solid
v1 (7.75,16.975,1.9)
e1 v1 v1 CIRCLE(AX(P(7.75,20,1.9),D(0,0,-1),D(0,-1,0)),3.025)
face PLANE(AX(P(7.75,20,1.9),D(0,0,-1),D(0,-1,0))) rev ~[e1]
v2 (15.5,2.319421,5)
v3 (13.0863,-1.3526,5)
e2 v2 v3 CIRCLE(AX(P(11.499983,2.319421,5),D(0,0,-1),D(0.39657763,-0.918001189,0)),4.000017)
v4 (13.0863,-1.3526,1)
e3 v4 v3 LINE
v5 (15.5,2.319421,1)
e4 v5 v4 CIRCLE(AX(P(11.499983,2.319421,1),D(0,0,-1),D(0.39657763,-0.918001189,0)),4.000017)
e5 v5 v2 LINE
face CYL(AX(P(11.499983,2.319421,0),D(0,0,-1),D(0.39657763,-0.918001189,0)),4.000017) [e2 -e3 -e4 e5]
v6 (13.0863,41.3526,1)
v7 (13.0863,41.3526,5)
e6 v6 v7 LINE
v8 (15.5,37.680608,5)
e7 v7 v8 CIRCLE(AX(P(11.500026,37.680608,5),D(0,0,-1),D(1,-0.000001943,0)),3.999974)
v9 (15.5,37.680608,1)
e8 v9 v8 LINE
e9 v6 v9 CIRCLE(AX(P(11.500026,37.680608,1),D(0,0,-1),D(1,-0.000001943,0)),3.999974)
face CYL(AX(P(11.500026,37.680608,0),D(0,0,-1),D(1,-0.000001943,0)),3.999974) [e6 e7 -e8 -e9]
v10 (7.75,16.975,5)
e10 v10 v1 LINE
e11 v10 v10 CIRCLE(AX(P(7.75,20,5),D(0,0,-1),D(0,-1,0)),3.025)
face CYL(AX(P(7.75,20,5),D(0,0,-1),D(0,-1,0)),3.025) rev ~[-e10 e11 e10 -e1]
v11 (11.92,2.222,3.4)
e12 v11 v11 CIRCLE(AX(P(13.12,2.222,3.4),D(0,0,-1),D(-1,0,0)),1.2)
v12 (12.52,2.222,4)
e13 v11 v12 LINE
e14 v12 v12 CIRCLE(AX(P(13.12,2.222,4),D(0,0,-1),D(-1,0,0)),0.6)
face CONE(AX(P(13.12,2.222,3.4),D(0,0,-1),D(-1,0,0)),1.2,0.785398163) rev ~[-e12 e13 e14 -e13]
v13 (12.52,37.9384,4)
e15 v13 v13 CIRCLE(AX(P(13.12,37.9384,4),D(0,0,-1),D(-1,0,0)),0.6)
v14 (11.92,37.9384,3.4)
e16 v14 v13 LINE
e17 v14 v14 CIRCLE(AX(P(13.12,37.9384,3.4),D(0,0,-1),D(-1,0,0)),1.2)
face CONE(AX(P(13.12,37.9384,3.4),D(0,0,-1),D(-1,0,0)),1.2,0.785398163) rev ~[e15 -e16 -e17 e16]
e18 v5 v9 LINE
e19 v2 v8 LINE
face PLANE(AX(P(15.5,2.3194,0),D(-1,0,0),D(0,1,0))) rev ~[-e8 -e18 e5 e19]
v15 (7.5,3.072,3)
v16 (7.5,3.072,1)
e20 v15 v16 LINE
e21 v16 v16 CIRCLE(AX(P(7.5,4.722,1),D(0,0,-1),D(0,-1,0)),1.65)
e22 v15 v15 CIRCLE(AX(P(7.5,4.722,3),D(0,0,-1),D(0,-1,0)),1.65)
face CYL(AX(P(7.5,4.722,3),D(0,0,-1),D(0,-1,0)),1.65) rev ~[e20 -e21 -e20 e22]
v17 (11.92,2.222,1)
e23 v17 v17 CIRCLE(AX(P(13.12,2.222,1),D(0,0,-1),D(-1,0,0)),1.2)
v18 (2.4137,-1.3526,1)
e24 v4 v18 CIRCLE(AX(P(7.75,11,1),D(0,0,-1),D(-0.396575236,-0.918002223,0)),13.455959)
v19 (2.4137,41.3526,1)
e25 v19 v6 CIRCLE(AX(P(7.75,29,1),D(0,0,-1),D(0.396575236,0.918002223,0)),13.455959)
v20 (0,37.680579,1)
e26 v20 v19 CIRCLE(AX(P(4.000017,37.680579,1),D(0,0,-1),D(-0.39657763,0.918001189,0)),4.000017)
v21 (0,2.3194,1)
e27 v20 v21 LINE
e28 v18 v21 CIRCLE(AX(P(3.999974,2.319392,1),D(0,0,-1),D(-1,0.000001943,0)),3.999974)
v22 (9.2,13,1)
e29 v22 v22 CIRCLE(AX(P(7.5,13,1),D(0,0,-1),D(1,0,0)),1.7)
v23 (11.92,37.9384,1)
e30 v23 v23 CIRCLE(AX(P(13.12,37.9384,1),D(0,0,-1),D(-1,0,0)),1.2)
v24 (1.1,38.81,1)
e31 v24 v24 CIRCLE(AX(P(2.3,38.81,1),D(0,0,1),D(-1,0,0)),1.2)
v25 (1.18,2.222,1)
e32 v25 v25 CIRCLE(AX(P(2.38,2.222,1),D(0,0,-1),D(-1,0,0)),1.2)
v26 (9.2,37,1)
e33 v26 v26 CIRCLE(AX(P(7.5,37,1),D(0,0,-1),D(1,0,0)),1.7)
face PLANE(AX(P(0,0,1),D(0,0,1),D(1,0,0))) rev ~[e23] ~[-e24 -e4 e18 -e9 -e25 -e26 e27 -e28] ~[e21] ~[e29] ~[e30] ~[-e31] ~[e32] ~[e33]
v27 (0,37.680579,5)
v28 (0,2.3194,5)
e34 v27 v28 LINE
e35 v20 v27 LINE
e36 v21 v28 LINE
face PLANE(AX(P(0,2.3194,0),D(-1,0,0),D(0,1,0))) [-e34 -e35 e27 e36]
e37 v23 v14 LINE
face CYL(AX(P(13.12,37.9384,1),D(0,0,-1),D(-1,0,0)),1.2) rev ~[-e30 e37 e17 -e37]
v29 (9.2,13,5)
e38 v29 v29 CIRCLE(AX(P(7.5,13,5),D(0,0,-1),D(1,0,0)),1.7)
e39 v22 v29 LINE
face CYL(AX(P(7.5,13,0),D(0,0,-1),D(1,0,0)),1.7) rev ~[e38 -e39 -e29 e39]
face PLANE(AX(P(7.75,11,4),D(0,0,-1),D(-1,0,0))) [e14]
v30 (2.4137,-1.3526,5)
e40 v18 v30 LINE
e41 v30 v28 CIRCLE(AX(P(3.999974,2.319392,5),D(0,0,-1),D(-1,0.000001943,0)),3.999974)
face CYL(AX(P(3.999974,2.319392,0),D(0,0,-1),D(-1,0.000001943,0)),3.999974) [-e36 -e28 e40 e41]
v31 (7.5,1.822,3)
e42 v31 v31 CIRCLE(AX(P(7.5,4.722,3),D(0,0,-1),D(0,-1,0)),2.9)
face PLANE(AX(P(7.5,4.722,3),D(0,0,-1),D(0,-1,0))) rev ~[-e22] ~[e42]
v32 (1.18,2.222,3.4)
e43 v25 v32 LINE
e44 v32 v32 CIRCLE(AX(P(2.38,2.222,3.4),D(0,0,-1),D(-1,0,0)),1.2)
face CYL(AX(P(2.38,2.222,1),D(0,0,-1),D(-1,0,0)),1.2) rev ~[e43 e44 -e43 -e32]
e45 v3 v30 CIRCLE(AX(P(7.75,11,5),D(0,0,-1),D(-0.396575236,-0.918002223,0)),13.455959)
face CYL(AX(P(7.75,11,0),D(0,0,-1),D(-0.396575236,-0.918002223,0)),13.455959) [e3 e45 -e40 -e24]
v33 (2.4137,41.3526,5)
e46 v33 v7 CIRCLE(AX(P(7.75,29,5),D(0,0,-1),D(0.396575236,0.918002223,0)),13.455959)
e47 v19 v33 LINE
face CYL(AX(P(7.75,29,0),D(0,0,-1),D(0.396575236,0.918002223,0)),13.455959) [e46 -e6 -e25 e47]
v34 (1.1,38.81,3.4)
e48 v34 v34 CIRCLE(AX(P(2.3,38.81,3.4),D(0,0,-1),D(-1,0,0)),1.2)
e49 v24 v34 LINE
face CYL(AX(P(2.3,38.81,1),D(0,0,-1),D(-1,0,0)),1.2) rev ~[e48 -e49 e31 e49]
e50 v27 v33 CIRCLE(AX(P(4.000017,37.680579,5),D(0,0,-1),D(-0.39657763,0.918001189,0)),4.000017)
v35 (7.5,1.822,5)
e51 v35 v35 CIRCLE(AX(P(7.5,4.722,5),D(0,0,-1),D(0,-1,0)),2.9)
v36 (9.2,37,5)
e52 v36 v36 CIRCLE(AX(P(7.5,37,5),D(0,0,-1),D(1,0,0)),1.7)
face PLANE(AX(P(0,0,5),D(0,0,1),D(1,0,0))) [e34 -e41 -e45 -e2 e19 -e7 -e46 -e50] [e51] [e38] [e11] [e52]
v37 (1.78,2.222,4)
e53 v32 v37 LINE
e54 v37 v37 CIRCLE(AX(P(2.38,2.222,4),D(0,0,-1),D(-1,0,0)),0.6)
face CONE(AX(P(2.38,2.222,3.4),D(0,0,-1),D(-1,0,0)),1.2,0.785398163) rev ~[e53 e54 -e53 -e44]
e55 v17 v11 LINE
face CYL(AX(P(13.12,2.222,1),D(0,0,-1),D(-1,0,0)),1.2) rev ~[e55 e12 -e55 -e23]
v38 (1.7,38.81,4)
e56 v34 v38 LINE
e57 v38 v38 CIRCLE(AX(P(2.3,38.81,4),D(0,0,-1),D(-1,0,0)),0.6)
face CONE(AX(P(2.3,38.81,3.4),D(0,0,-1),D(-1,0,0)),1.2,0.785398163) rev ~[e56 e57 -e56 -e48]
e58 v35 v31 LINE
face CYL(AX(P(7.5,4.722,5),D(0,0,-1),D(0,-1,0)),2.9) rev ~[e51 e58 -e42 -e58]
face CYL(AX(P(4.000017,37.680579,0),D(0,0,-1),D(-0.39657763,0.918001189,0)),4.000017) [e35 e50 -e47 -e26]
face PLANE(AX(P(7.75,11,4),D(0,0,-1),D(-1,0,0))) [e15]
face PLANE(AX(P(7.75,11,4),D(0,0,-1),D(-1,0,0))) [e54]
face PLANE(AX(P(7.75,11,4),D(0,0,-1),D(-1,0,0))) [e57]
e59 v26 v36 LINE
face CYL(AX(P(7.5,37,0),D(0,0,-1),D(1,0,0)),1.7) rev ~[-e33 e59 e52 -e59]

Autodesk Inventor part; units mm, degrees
ref_plane "YZ Plane" through (0, 0, 0) normal (1, 0, 0) x (0, 1, 0)
ref_plane "XZ Plane" through (0, 0, 0) normal (0, 1, 0) x (-1, 0, 0)
ref_plane "XY Plane" through (0, 0, 0) normal (0, 0, 1) x (1, 0, 0)
sketch "Skizze1" plane through (0, 0, 0) normal (0, 0, 1) x (1, 0, 0)
  circle A0 centre (7.5, 13) radius 1.7 projected
  circle A1 centre (7.5, 37) radius 1.7 projected
  arc A2 (15.5, 37.6806) -> (13.0863, 41.3526) centre (11.5, 37.6806) ccw projected
  arc A3 (13.0863, 41.3526) -> (2.4137, 41.3526) centre (7.75, 29) ccw projected
  arc A4 (2.4137, 41.3526) -> (0, 37.6806) centre (4, 37.6806) ccw projected
  line L0 (0, 2.3194) -> (0, 37.6806) projected
  arc A5 (0, 2.3194) -> (2.4137, -1.3526) centre (4, 2.3194) ccw projected
  arc A6 (2.4137, -1.3526) -> (13.0863, -1.3526) centre (7.75, 11) ccw projected
  arc A7 (13.0863, -1.3526) -> (15.5, 2.3194) centre (11.5, 2.3194) ccw projected
  line L1 (15.5, 2.3194) -> (15.5, 37.6806) projected
  point P0 (0, 0)
extrude "Extrusion1" add sketch "Skizze1" along normal blind 5
sketch "Skizze2" plane through (0, 0, 5) normal (0, 0, 1) x (1, 0, 0)
  arc A0 (2.4137, -1.3526) -> (13.0863, -1.3526) centre (7.75, 11) ccw projected
  arc A1 (13.0863, -1.3526) -> (15.5, 2.3194) centre (11.5, 2.3194) ccw projected
  line L0 (15.5, 2.3194) -> (15.5, 37.6806) projected
  arc A2 (15.5, 37.6806) -> (13.0863, 41.3526) centre (11.5, 37.6806) ccw projected
  arc A3 (13.0863, 41.3526) -> (2.4137, 41.3526) centre (7.75, 29) ccw projected
  arc A4 (2.4137, 41.3526) -> (0, 37.6806) centre (4, 37.6806) ccw projected
  line L1 (0, 37.6806) -> (0, 2.3194) projected
  arc A5 (0, 2.3194) -> (2.4137, -1.3526) centre (4, 2.3194) ccw projected
  circle A6 centre (7.5, 37) radius 1.7 projected
  circle A7 centre (7.5, 13) radius 1.7 projected
  line L2 (7.75, 20) -> (7.75, 20)
  line L3 (7.75, 20) -> (7.75, -2.4559)
  line L4 (7.75, -2.4559) -> (7.75, -2.4559)
  line L5 (7.75, -2.4559) -> (7.75, 20)
  point P0 (0, 0)
  point P1 (7.75, -2.4559)
  dimension "d2" = 44.9119
  dimension "d3" = 15.5
  dimension "d4" = 22.456
  dimension "d5" = 0
hole "Bohrung1" at (7.75, 20, 5) direction (0, 0, -1) diameter 6.05 depth 3.1
sketch "Skizze4" plane through (0, 0, 5) normal (0, 0, 1) x (1, 0, 0)
  circle A0 centre (7.5, 4.722) radius 1.9913 projected
  point P0 (0, 0)
hole "Bohrung2" at (7.5, 4.722, 5) direction (0, 0, -1) diameter 3.3 end through all counterbore diameter 5.8 counterbore depth 2 clearance for "Inbusschraube DIN EN ISO 4762" size "M3" standard "DIN"
move faces "Verschieben1" translate (0, 0, 1) faces at (13.3835, 17.8023, 0)
sketch "Skizze6" plane through (7.75, 11, 1) normal (0, 0, -1) x (-1, 0, 0)
  circle A0 centre (-5.37, 26.9384) radius 1
  circle A1 centre (5.81, 25.1971) radius 1
  circle A2 centre (5.81, 25.1971) radius 1.2
  circle A3 centre (-5.37, 26.9384) radius 1.2
  circle A4 centre (5.87, 26.9384) radius 1
  circle A5 centre (-5.37, 26.9384) radius 1
  circle A6 centre (5.87, 26.9384) radius 1.2
  arc A7 (4.9199, 26.9621) -> (4.4911, 27.5261) centre (5.45, 27.81) ccw
  circle A8 centre (-5.37, 26.9384) radius 1
  circle A9 centre (5.37, -8.778) radius 1
  circle A10 centre (-5.37, -8.778) radius 1
  circle A11 centre (5.45, 27.81) radius 1.2
  circle A12 centre (-5.37, -8.778) radius 1.2
  circle A13 centre (5.37, -8.778) radius 1.2
  point P0 (7.75, -11)
  dimension "d37" = 2.4
  dimension "d38" = 2.4
  dimension "d44" = 2.4
  dimension "d45" = 2.4
  dimension "d46" = 2.4
  dimension "d47" = 2.4
extrude "Extrusion4" cut sketch "Skizze6" against normal blind 3 contours A0 | A11 A6 | A6 A7 A4 A11 | A11 A4 A7 A6 | A4 A11 | A3 | A9 | A10 | A12 | A13
chamfer "Fase1" distance 0.6 angle 45 4 edges at (14.32, 37.9384, 4) (3.5, 38.81, 4) (3.58, 2.222, 4) (14.32, 2.222, 4)
equation "\"d4\" = 0.5 * d2"
equation "\"d37\" = d38"
equation "\"d44\" = d38"
equation "\"d45\" = d38"
equation "\"d46\" = d38"
equation "\"d47\" = d38"
properties part number "Front-Idlers_Housing-Cover"
